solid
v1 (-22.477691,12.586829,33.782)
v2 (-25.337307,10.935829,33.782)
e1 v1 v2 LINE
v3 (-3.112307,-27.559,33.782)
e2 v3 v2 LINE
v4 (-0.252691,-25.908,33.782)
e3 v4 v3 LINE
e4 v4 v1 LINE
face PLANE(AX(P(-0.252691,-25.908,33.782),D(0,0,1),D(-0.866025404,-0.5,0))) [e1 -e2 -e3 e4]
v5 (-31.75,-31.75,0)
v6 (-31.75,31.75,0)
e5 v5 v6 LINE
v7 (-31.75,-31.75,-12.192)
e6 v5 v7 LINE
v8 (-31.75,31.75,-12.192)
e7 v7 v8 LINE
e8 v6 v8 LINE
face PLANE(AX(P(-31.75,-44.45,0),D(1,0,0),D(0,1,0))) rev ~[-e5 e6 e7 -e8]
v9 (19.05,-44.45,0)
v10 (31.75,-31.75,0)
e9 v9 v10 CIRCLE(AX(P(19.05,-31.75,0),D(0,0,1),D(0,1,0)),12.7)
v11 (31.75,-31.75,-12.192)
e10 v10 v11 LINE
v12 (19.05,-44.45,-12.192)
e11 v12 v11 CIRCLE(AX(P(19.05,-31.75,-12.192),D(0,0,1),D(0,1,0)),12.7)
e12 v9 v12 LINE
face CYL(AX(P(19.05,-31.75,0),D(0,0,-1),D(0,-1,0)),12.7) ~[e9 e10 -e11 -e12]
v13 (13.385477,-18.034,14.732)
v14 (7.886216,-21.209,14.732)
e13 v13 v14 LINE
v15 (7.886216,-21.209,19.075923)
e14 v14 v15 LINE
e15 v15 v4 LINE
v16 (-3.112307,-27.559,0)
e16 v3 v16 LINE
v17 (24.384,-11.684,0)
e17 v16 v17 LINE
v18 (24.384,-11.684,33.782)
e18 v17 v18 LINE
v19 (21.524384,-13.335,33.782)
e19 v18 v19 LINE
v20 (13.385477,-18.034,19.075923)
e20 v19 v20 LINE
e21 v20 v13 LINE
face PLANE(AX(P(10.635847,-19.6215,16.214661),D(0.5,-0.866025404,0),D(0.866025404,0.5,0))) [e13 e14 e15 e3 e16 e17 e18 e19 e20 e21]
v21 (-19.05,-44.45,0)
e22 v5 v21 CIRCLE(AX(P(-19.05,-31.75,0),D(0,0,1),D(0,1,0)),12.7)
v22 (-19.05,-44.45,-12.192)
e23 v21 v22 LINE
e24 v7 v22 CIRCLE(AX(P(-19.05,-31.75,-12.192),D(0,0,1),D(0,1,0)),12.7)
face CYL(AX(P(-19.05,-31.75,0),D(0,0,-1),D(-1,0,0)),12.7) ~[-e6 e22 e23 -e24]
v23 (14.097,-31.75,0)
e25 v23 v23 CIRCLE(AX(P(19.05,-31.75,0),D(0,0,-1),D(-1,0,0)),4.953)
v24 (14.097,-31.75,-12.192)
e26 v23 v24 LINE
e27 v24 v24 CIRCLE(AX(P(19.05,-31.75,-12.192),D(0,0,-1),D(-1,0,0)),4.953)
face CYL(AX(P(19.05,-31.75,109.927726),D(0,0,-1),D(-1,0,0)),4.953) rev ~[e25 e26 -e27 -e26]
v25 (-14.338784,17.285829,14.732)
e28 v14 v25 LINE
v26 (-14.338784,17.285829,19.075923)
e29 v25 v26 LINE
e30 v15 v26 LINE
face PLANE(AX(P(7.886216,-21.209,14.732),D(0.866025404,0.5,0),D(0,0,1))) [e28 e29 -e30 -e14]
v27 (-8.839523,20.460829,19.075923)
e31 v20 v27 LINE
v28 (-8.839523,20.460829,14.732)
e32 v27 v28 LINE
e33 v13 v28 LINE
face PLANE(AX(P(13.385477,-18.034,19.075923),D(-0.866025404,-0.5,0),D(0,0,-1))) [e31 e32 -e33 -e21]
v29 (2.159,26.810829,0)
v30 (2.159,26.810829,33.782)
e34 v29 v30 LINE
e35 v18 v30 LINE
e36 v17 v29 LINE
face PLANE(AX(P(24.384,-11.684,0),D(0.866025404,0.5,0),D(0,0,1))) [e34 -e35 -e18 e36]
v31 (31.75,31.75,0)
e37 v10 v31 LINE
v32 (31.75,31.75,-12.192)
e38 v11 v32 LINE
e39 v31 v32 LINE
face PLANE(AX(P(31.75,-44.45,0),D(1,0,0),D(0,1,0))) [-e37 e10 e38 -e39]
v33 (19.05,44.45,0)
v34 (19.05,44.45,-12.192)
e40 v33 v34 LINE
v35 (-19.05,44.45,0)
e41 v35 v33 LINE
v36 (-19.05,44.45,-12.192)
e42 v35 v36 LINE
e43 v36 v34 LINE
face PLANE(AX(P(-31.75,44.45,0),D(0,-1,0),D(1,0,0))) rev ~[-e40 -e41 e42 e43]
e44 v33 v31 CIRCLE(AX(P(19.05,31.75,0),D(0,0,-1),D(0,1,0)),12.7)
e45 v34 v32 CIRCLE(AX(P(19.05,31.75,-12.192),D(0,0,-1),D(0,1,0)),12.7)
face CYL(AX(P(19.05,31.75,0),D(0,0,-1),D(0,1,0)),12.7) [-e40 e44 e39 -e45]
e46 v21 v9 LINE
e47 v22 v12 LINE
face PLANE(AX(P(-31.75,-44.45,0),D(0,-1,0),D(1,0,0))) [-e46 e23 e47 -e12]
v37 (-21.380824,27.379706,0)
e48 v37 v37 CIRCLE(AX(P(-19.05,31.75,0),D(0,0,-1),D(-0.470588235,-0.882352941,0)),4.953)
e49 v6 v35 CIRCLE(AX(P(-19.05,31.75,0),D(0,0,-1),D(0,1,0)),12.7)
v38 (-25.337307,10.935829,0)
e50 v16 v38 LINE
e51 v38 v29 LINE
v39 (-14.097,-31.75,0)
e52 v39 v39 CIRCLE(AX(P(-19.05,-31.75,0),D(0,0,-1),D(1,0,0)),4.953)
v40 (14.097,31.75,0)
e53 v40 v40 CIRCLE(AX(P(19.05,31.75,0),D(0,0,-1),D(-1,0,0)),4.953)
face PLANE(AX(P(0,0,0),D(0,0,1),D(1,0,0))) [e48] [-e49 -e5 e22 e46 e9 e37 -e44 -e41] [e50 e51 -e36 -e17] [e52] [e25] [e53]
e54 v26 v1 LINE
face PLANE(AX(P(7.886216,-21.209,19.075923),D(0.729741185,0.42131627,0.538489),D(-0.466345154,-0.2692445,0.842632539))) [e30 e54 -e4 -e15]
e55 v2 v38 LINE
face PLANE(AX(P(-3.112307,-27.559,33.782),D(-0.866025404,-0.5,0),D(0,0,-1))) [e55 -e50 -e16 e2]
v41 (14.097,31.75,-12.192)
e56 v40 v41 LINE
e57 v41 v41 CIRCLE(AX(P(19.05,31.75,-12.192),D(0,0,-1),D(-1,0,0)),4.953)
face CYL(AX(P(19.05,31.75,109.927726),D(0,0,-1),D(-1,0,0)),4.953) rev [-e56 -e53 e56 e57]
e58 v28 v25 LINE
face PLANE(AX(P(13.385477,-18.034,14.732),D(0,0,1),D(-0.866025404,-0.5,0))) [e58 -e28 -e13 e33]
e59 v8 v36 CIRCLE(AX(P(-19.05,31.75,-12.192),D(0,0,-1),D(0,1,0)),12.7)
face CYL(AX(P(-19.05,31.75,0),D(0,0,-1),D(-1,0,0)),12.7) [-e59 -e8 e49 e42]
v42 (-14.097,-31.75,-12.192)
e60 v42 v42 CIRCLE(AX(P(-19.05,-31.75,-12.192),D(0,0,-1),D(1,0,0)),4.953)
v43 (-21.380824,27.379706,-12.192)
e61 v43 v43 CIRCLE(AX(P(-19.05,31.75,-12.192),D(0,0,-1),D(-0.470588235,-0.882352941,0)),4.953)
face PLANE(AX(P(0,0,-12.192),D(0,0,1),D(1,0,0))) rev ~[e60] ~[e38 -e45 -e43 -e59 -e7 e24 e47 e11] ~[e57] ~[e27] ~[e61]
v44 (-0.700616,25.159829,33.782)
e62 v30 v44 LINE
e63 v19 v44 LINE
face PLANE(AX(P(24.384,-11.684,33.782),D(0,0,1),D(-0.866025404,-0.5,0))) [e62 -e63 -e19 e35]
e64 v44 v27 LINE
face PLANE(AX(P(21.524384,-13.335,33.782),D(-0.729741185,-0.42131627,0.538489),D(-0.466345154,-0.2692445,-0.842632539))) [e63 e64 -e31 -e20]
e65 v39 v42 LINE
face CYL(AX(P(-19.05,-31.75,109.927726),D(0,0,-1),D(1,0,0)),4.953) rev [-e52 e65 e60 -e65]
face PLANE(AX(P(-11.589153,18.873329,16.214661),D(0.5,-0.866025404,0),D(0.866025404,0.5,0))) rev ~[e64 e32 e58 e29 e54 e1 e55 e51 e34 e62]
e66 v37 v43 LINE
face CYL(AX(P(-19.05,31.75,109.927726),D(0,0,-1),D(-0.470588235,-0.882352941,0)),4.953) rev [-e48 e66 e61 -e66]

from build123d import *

# Parameters (mm, degrees)
F0_W     = 63.5
F0_H     = 88.9
F1_DEPTH = 12.192
F2_D     = 9.906
F6_DEPTH = 44.45
F7_R     = 12.7


# Not quite as in the source:
# - a pattern or mirror of a feature is missing from the dataset's text; its kind, count and spacing are read off the source's solid


with BuildPart() as f1:
    # F0 (on Top) → F1 (new body)
    with BuildSketch(Plane.XY):
        Rectangle(F0_W, F0_H)
    extrude(amount=-F1_DEPTH)

    # F2 (through all)
    with Locations(Plane.XY):
        with Locations((19.05, -31.75)):
            f2 = Hole(F2_D / 2)

    # F2_copies: F2 across plane
    add(f2.mirror(Plane(origin=(0, 0, 0), x_dir=(0.8574929257, 0.5144957554, 0), z_dir=(-0.5144957554, 0.8574929257, 0))), mode=Mode.SUBTRACT)

    # F2_copies1: F2 across plane
    add(f2.mirror(Plane(origin=(0, 0, 0), x_dir=(0, 0, -1), z_dir=(-1, 0, 0))), mode=Mode.SUBTRACT)

    # F2_copies2: F2 across plane
    add(f2.mirror(Plane.ZX), mode=Mode.SUBTRACT)

    # F5 (on line) → F6 (join, through all)
    with BuildSketch(Plane(origin=(11.1553204089, -19.3215817229, 0), x_dir=(0.8660254038, 0.5, 0), z_dir=(0.5, -0.8660254038, 0))):
        Polygon((-16.4748365541, 33.782), (-16.4748365541, 0), (15.2751634459, 0), (15.2751634459, 33.782), (11.9731634459, 33.782), (2.5751634459, 19.0759231813), (2.5751634459, 14.732), (-3.7748365541, 14.732), (-3.7748365541, 19.0759231813), (-13.1728365541, 33.782), align=None)
    extrude(amount=-F6_DEPTH)

    # F7
    f7_edges = [f1.edges().sort_by_distance(p)[0] for p in [
        (31.75, -44.45, -6.096),
        (31.75, 44.45, -6.096),
        (-31.75, 44.45, -6.096),
        (-31.75, -44.45, -6.096),
    ]]
    fillet(f7_edges, radius=F7_R)


solid = f1.part
